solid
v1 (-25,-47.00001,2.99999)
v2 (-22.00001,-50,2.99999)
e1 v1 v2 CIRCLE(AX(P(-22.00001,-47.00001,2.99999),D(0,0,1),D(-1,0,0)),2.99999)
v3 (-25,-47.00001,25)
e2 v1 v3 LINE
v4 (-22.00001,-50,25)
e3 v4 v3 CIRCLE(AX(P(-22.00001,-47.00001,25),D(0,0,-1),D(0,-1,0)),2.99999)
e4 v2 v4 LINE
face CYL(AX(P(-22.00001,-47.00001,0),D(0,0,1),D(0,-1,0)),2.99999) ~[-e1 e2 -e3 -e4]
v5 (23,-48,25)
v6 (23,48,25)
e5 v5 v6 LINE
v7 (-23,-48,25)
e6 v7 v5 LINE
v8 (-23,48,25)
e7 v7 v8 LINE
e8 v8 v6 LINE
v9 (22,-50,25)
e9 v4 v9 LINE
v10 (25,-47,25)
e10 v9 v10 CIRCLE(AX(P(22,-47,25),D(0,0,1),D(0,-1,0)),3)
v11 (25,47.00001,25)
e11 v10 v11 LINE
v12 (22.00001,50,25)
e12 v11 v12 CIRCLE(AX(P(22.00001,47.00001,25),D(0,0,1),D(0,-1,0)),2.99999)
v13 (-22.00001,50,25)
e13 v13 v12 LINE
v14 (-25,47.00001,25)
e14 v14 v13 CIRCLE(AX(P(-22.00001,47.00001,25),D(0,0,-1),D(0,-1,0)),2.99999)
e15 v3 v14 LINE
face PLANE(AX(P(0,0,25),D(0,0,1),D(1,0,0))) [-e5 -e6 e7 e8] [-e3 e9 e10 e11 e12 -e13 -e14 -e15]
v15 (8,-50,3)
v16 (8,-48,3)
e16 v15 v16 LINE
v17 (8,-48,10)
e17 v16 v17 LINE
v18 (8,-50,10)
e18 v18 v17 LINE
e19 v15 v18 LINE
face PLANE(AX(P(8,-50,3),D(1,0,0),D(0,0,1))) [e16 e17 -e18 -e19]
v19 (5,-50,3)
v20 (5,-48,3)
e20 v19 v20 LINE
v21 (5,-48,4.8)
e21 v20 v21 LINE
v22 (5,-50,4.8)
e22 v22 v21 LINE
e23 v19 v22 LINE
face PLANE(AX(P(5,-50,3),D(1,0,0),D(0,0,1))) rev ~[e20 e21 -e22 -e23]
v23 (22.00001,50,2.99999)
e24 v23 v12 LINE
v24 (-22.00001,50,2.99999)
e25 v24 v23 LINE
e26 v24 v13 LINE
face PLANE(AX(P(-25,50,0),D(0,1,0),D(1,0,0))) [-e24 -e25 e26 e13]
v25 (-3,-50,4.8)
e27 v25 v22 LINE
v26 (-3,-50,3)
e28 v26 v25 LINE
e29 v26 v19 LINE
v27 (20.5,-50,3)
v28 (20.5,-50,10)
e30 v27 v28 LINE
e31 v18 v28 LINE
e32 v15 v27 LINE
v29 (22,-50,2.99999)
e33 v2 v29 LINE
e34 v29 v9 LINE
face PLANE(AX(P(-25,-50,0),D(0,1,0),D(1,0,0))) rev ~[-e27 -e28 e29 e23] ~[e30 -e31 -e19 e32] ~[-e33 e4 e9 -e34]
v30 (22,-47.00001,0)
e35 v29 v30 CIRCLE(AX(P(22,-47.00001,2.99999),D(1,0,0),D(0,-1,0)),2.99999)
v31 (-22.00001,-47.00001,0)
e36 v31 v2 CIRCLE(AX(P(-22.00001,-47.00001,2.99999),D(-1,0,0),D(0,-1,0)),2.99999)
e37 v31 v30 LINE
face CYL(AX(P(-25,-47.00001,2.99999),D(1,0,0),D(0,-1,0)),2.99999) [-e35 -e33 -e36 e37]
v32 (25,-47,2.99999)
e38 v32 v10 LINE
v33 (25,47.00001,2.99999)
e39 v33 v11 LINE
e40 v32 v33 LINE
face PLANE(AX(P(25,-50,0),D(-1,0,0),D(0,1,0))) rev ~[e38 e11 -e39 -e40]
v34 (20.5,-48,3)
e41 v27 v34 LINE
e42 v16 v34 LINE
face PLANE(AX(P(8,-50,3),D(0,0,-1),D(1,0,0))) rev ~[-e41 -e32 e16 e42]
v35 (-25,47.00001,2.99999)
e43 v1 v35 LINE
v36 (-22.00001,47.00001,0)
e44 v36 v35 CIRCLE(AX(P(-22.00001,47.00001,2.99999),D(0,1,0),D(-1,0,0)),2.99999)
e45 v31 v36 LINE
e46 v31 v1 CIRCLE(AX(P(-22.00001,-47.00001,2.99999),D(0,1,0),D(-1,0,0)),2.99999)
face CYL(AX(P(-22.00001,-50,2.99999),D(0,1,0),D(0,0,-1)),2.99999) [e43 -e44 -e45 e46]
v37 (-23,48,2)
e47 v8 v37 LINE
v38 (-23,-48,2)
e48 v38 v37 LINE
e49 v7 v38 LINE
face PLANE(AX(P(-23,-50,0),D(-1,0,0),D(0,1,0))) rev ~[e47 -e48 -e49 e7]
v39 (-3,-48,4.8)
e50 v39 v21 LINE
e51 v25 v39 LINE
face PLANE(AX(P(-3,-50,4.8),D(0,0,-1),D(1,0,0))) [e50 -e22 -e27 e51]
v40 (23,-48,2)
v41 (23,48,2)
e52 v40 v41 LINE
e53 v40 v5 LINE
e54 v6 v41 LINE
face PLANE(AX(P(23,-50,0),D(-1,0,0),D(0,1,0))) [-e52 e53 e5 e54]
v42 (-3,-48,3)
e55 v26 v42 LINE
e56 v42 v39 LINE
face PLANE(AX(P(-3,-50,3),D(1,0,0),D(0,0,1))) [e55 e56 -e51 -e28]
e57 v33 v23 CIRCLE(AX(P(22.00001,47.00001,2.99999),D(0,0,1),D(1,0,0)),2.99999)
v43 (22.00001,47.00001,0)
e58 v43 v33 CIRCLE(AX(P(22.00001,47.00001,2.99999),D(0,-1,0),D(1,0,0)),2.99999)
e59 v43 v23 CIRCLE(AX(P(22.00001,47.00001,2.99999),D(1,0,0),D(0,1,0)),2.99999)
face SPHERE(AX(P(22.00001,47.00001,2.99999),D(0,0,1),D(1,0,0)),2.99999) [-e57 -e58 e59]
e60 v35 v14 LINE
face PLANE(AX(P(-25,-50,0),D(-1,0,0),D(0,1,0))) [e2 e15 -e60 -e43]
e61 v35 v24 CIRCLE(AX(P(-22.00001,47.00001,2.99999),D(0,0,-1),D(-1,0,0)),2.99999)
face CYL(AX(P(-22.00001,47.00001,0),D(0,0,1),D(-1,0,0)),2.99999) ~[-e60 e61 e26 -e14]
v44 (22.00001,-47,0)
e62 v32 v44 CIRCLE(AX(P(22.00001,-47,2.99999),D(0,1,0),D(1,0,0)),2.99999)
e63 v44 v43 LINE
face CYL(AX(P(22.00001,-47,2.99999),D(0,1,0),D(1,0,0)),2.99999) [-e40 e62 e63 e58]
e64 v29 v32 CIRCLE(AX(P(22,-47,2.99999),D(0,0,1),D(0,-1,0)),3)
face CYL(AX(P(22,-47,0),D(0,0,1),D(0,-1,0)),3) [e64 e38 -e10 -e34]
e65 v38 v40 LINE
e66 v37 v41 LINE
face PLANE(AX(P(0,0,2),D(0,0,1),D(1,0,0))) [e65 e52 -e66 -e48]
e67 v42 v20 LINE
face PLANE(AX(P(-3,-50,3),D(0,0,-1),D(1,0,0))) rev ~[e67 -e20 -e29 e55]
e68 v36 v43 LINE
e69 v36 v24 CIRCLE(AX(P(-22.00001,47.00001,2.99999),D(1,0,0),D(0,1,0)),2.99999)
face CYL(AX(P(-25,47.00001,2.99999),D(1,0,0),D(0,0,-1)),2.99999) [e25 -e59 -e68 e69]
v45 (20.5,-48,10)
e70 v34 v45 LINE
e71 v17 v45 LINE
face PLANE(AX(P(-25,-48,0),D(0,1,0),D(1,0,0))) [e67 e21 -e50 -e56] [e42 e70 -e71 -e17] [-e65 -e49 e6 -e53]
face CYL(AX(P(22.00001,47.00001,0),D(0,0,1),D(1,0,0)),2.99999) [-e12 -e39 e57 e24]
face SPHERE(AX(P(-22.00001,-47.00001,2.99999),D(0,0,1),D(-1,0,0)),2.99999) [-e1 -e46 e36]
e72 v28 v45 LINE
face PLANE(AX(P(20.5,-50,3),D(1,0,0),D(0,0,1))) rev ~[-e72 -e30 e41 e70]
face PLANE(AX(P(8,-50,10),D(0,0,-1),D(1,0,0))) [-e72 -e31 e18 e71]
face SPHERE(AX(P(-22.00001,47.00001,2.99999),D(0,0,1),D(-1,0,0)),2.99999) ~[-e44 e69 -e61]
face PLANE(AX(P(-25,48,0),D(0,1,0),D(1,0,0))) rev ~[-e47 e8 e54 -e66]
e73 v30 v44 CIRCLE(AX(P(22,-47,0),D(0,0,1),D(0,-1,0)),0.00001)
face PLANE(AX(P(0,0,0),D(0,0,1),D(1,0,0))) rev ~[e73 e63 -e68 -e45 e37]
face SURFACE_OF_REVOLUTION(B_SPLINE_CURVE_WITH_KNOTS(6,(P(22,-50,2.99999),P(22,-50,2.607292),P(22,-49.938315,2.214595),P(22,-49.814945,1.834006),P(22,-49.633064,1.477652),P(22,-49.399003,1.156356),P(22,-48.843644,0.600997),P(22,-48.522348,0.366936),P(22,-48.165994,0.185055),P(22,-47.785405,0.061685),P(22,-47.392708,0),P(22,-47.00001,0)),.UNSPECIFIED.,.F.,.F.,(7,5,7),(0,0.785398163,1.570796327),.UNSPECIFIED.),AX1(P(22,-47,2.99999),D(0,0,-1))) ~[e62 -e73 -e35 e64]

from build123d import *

# Parameters (mm, degrees)
F0_W     = 50
F0_H     = 100
F1_DEPTH = 25
F2_T     = -2
F3_W     = 12.5
F3_H     = 7
F3_W_2   = 8
F3_H_2   = 1.8
F4_DEPTH = 2
F5_R     = 3
F6_R     = 2.99999


# Not quite as in the source:
# - a fillet or chamfer is up to 0.001 mm smaller than in the source, because OpenCascade refuses the exact size


with BuildPart() as f1:
    # F0 (on Top) → F1 (new body)
    with BuildSketch(Plane.XY):
        Rectangle(F0_W, F0_H)
    extrude(amount=F1_DEPTH)

    # F2
    f2_openings = [f1.faces().sort_by_distance(p)[0] for p in [
        (0, 0, 25),
    ]]
    offset(amount=F2_T, openings=f2_openings)

    # F3 (on face) → F4 (cut)
    with BuildSketch(Plane.XZ.offset(50)):
        with Locations((14.25, 6.5)):
            Rectangle(F3_W, F3_H)
        with Locations((1, 3.9)):
            Rectangle(F3_W_2, F3_H_2)
    extrude(amount=-F4_DEPTH, mode=Mode.SUBTRACT)

    # F5
    f5_edges = [f1.edges().sort_by_distance(p)[0] for p in [
        (25, -50, 12.5),
    ]]
    fillet(f5_edges, radius=F5_R)

    # F6 (radius 3 in the source; OpenCascade refuses exactly that, so slightly less here)
    f6_edges = [f1.edges().sort_by_distance(p)[0] for p in [
        (25, 50, 12.5),
        (-25, 50, 12.5),
        (-25, -50, 12.5),
        (-25, 0, 0),
        (-1.5, -50, 0),
        (0, 50, 0),
    ]]
    fillet(f6_edges, radius=F6_R)


solid = f1.part
